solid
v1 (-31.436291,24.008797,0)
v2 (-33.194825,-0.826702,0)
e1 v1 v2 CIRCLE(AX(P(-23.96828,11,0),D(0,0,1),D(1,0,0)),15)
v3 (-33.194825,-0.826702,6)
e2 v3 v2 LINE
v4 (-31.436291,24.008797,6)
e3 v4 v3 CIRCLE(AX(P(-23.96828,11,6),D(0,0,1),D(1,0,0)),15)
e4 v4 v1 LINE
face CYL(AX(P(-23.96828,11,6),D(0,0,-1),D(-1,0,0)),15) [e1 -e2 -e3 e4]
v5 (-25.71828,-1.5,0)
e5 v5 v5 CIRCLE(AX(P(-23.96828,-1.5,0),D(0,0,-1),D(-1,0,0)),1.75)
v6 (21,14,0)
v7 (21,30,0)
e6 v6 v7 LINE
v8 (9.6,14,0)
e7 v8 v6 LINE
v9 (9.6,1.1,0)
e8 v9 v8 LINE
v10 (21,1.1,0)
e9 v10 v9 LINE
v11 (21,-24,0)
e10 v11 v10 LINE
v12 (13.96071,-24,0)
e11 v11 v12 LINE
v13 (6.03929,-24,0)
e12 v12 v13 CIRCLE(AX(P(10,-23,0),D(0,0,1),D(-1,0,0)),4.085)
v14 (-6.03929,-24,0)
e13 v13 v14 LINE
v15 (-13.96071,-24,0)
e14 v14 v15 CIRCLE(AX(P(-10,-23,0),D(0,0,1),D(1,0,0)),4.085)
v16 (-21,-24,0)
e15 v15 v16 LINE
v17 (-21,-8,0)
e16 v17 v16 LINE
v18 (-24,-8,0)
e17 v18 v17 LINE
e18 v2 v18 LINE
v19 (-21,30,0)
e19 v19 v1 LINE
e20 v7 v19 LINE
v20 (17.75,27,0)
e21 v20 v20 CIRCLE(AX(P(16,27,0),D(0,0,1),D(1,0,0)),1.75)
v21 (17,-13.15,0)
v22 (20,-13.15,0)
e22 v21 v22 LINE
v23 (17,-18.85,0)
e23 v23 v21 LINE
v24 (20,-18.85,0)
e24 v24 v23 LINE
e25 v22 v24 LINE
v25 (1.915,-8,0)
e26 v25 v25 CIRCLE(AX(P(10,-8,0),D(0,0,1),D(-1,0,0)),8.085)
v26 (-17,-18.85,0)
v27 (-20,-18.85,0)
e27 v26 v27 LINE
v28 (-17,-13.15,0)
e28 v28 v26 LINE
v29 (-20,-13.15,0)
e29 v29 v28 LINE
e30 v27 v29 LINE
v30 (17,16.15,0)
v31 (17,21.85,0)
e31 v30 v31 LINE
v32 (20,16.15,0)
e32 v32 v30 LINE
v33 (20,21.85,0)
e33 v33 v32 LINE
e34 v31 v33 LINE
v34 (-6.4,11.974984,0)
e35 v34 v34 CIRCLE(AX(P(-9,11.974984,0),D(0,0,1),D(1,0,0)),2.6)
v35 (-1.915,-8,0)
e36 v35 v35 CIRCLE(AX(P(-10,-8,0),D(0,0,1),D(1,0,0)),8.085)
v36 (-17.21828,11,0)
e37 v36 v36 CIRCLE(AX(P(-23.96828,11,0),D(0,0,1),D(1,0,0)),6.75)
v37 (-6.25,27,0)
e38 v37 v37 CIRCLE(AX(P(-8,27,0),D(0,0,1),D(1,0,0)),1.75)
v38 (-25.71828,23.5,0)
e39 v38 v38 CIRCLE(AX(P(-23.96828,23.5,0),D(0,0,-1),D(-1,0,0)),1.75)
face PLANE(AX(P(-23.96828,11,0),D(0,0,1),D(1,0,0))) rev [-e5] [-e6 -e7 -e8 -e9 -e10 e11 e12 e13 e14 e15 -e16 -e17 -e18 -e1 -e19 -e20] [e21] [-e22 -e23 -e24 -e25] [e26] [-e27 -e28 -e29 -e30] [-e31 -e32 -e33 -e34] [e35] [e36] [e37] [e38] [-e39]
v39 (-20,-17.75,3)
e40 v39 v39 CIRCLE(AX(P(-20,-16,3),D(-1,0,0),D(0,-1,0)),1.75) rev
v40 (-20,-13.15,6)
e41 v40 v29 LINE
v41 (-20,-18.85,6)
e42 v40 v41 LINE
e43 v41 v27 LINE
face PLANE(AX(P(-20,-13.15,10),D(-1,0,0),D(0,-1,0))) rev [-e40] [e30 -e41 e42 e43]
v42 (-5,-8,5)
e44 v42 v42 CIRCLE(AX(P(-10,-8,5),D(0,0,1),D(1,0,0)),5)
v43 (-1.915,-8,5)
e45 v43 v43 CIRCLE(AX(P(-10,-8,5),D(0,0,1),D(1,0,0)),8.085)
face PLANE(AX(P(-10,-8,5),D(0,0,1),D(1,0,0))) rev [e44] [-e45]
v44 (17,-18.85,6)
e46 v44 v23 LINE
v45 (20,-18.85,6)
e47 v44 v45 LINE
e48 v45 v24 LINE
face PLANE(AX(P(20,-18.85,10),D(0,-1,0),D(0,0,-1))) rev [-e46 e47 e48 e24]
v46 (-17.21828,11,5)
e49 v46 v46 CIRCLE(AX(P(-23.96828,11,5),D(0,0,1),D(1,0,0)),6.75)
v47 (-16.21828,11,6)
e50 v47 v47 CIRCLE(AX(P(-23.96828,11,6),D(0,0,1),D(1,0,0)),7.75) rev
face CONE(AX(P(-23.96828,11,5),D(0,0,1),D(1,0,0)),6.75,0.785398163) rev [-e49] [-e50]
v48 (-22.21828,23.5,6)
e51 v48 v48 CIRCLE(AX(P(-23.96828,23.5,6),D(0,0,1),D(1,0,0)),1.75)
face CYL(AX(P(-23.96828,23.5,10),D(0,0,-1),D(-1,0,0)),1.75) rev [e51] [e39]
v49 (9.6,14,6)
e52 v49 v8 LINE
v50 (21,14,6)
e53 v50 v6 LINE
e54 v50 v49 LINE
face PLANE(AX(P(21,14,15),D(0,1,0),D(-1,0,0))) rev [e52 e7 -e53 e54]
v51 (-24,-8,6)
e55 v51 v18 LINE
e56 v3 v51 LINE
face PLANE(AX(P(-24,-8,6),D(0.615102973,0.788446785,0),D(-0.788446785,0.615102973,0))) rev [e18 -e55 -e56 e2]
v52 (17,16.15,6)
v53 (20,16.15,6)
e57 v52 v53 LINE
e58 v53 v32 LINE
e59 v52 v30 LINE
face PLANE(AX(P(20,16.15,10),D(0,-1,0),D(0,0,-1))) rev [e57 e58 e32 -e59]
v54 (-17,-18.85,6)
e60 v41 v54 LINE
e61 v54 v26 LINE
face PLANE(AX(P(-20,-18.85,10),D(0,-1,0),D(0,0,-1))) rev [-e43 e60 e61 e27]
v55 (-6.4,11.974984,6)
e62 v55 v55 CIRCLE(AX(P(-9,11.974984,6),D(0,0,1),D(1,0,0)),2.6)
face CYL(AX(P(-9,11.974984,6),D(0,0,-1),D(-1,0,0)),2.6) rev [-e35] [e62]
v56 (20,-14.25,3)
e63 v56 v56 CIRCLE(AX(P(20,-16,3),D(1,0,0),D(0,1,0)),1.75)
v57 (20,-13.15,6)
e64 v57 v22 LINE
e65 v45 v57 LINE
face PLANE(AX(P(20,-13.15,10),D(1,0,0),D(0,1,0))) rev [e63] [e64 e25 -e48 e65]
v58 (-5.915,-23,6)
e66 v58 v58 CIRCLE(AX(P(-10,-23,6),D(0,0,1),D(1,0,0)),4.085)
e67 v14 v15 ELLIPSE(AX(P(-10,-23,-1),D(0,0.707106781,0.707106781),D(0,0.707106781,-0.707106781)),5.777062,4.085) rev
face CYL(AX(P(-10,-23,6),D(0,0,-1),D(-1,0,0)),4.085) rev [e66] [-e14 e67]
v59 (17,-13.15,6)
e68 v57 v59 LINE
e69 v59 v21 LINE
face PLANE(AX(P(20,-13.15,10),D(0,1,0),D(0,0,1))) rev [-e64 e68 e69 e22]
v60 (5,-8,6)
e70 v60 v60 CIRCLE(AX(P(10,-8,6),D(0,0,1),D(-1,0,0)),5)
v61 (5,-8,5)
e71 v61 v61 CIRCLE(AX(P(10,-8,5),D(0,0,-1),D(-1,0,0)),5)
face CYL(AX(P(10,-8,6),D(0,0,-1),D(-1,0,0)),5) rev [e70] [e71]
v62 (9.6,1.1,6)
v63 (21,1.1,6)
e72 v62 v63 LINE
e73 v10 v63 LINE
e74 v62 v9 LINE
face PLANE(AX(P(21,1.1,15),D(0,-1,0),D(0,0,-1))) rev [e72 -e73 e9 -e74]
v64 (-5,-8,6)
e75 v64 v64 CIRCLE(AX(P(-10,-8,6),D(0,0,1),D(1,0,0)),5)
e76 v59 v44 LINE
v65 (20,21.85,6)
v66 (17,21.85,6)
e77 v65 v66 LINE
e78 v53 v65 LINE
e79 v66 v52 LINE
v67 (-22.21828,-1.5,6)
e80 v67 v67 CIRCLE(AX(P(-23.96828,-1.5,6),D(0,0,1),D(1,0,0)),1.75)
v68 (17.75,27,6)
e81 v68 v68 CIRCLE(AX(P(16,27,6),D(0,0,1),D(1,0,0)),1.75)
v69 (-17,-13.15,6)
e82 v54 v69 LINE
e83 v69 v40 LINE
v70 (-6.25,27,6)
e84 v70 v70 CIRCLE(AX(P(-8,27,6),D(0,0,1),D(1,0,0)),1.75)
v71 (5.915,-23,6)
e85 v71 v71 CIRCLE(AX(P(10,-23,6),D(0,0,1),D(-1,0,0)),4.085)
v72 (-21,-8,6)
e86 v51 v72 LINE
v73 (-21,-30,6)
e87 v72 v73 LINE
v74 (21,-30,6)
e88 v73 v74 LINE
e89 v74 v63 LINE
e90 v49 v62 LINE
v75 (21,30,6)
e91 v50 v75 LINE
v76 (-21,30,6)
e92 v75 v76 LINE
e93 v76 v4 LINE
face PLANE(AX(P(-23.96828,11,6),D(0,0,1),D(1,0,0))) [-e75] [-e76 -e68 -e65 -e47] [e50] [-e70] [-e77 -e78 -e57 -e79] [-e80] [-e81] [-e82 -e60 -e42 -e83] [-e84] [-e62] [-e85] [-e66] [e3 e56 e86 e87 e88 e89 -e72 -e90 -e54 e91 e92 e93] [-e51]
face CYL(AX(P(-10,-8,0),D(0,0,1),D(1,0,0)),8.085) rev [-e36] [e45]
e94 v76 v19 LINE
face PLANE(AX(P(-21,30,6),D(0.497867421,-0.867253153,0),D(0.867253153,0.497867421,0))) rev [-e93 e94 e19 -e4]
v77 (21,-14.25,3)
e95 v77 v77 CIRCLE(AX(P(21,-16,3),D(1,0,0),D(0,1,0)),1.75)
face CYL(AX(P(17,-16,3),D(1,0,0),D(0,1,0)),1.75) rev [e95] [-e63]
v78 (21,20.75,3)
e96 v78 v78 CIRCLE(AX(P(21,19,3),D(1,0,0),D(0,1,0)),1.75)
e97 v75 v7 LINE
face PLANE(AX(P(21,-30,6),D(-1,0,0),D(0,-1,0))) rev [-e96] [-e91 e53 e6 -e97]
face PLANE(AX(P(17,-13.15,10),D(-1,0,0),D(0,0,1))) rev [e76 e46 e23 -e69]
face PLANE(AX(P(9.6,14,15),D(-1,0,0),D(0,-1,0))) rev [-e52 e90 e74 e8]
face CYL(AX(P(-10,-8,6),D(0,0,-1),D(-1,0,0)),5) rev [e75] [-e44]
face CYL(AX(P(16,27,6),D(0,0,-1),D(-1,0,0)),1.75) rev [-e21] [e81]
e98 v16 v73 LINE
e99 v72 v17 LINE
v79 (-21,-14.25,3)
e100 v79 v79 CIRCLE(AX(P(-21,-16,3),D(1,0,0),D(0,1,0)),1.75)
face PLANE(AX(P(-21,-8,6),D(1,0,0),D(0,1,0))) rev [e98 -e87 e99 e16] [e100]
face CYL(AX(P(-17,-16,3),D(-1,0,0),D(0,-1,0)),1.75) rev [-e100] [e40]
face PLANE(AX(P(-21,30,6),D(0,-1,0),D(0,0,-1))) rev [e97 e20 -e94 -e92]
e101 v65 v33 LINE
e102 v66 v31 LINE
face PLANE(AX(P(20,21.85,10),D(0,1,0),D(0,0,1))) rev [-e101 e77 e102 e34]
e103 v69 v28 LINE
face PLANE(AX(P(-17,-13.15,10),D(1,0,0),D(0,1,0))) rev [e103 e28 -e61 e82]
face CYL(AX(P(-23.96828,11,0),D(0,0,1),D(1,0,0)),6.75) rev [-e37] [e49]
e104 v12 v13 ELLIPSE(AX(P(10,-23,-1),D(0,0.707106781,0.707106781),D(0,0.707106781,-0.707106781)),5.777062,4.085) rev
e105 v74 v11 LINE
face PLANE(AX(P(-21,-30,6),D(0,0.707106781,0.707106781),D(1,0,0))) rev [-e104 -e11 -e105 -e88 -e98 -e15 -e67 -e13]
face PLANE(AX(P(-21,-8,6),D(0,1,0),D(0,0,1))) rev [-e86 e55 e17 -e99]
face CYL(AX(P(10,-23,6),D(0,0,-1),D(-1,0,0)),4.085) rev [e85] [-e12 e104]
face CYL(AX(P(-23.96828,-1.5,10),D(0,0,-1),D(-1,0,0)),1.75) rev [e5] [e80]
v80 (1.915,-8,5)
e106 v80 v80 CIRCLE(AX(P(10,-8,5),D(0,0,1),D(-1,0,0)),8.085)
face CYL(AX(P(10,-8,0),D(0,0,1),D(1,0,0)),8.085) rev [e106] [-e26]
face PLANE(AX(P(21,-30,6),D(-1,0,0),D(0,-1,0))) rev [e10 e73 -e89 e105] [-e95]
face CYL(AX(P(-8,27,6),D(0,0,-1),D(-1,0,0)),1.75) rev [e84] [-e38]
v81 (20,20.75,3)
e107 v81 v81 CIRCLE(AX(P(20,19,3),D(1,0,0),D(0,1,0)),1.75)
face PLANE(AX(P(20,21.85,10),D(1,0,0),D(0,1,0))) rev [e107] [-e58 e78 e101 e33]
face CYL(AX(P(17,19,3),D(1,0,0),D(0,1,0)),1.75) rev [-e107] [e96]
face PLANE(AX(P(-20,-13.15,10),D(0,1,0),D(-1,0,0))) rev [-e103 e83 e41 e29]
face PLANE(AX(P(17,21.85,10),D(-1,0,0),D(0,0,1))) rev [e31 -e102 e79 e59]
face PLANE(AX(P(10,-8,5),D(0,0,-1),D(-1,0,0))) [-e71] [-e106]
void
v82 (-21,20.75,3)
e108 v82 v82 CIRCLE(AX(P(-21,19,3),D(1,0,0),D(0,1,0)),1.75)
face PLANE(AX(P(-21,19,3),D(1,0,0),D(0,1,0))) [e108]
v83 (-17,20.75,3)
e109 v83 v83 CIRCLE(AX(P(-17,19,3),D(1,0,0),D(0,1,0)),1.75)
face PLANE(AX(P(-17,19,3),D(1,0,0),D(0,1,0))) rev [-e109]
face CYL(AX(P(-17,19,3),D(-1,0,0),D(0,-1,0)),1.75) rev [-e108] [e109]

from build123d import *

# Parameters (mm, degrees)
SKETCH1_R           = 4.085
SKETCH1_R_2         = 5
SKETCH1_R_3         = 2.6
SKETCH1_R_4         = 2.5
SKETCH1_R_5         = 1.75
BOSS_EXTRUDE1_DEPTH = 6
CUT_EXTRUDE1_START  = -1
SKETCH2_R           = 8.085
CUT_EXTRUDE1_DEPTH  = 49.543181614
SKETCH5_R           = 6.75
CUT_EXTRUDE4_DEPTH  = 50.543181614
CHAMFER1_SIZE       = 6
SKETCH6_W           = 11.4
SKETCH6_H           = 12.9
CUT_EXTRUDE5_DEPTH  = 15
SKETCH7_R           = 1.75
SKETCH7_W           = 3
SKETCH7_H           = 5.7
CUT_EXTRUDE6_DEPTH  = 10
CUT_EXTRUDE7_START  = -42
SKETCH8_R           = 1.75
CUT_EXTRUDE7_DEPTH  = 4
CUT_EXTRUDE8_START  = -4
SKETCH8_2_R         = 1.75
CUT_EXTRUDE8_DEPTH  = 4
CHAMFER2_SIZE       = 1


with BuildPart() as part:
    # Sketch1 → Boss-Extrude1 (new body)
    with BuildSketch(Plane.XY):
        with BuildLine():
            Line((-21, -30), (21, -30))
            Line((21, -30), (21, 30))
            Line((21, 30), (-21, 30))
            Line((-21, 30), (-31.4362913, 24.008797289))
            ThreePointArc((-31.4362913, 24.008797289), (-38.93081829, 12.059456115), (-33.194824566, -0.826701779))
            Line((-33.194824566, -0.826701779), (-24, -8))
            Line((-24, -8), (-21, -8))
            Line((-21, -8), (-21, -30))
        make_face()
        with Locations((-10, -23)):
            Circle(SKETCH1_R, mode=Mode.SUBTRACT)
        with Locations((-10, -8)):
            Circle(SKETCH1_R_2, mode=Mode.SUBTRACT)
        with Locations(Location((10, -8, 0), (0, 0, 180))):
            Circle(SKETCH1_R_2, mode=Mode.SUBTRACT)
        with Locations(Location((10, -23, 0), (0, 0, 180))):
            Circle(SKETCH1_R, mode=Mode.SUBTRACT)
        with Locations((-9, 11.974984355)):
            Circle(SKETCH1_R_3, mode=Mode.SUBTRACT)
        with Locations((-23.968279978, 11)):
            Circle(SKETCH1_R_4, mode=Mode.SUBTRACT)
        with Locations((16, 27)):
            Circle(SKETCH1_R_5, mode=Mode.SUBTRACT)
        with Locations((-8, 27)):
            Circle(SKETCH1_R_5, mode=Mode.SUBTRACT)
    extrude(amount=BOSS_EXTRUDE1_DEPTH)

    # Sketch2 → Cut-Extrude1 (cut, through all)
    with BuildSketch(Plane.XY.offset(6).offset(CUT_EXTRUDE1_START)):
        with Locations((-10, -8)):
            Circle(SKETCH2_R)
        with Locations(Location((10, -8, 0), (0, 0, 180))):
            Circle(SKETCH2_R)
    extrude(amount=-CUT_EXTRUDE1_DEPTH, mode=Mode.SUBTRACT)

    # Sketch5 → Cut-Extrude4 (cut, through all)
    with BuildSketch(Plane.XY.offset(6)):
        with Locations((-23.968279978, 11)):
            Circle(SKETCH5_R)
    extrude(amount=-CUT_EXTRUDE4_DEPTH, mode=Mode.SUBTRACT)

    # Chamfer1
    # the kernel refuses this chamfer: 6 mm, written as the material it takes off along each edge
    with BuildSketch(Plane(origin=(-36.430097928, -30, 0), x_dir=(0, 0.9996219169112969, -0.027495876610586382), z_dir=(1, 0, 0))) as chamfer1_piece_1:
        Polygon((CHAMFER1_SIZE * 0.999621916911, CHAMFER1_SIZE * 0.0274958766106), (-CHAMFER1_SIZE * 0.0274958766106, CHAMFER1_SIZE * 0.999621916911), (0, 0), align=None)
    extrude(amount=72.860195856, mode=Mode.SUBTRACT)

    # Sketch6 → Cut-Extrude5 (cut)
    with BuildSketch(Plane(origin=(0, 0, 0), x_dir=(-1, 0, 0), z_dir=(0, 0, -1))):
        with Locations((-15.3, 7.55)):
            Rectangle(SKETCH6_W, SKETCH6_H)
    extrude(amount=-CUT_EXTRUDE5_DEPTH, mode=Mode.SUBTRACT)

    # Sketch7 → Cut-Extrude6 (cut)
    with BuildSketch(Plane(origin=(0, 0, 0), x_dir=(-1, 0, 0), z_dir=(0, 0, -1))):
        with Locations((23.968279978, 23.5)):
            Circle(SKETCH7_R)
        with Locations((23.968279978, -1.5)):
            Circle(SKETCH7_R)
        with Locations((-18.5, -16)):
            Rectangle(SKETCH7_W, SKETCH7_H)
        with Locations((18.5, -16)):
            Rectangle(SKETCH7_W, SKETCH7_H)
        with Locations((-18.5, 19)):
            Rectangle(SKETCH7_W, SKETCH7_H)
    extrude(amount=-CUT_EXTRUDE6_DEPTH, mode=Mode.SUBTRACT)

    # Sketch8 → Cut-Extrude7 (cut)
    with BuildSketch(Plane(origin=(21, 0, 0), x_dir=(0, 0, -1), z_dir=(1, 0, 0)).offset(CUT_EXTRUDE7_START)):
        with Locations(Location((-3, -16, 0), (0, 0, 270))):
            Circle(SKETCH8_R)
        with Locations(Location((-3, 19, 0), (0, 0, 90))):
            Circle(SKETCH8_R)
    extrude(amount=CUT_EXTRUDE7_DEPTH, mode=Mode.SUBTRACT)

    # Sketch8<2> → Cut-Extrude8 (cut)
    with BuildSketch(Plane(origin=(21, 0, 0), x_dir=(0, 0, -1), z_dir=(1, 0, 0)).offset(CUT_EXTRUDE8_START)):
        with Locations(Location((-3, -16, 0), (0, 0, 270))):
            Circle(SKETCH8_2_R)
        with Locations(Location((-3, 19, 0), (0, 0, 90))):
            Circle(SKETCH8_2_R)
    extrude(amount=CUT_EXTRUDE8_DEPTH, mode=Mode.SUBTRACT)

    # Chamfer2
    chamfer2_edges = [part.edges().sort_by_distance(p)[0] for p in [
        (-30.718279978, 11, 6),
    ]]
    chamfer(chamfer2_edges, length=CHAMFER2_SIZE)


solid = part.part
